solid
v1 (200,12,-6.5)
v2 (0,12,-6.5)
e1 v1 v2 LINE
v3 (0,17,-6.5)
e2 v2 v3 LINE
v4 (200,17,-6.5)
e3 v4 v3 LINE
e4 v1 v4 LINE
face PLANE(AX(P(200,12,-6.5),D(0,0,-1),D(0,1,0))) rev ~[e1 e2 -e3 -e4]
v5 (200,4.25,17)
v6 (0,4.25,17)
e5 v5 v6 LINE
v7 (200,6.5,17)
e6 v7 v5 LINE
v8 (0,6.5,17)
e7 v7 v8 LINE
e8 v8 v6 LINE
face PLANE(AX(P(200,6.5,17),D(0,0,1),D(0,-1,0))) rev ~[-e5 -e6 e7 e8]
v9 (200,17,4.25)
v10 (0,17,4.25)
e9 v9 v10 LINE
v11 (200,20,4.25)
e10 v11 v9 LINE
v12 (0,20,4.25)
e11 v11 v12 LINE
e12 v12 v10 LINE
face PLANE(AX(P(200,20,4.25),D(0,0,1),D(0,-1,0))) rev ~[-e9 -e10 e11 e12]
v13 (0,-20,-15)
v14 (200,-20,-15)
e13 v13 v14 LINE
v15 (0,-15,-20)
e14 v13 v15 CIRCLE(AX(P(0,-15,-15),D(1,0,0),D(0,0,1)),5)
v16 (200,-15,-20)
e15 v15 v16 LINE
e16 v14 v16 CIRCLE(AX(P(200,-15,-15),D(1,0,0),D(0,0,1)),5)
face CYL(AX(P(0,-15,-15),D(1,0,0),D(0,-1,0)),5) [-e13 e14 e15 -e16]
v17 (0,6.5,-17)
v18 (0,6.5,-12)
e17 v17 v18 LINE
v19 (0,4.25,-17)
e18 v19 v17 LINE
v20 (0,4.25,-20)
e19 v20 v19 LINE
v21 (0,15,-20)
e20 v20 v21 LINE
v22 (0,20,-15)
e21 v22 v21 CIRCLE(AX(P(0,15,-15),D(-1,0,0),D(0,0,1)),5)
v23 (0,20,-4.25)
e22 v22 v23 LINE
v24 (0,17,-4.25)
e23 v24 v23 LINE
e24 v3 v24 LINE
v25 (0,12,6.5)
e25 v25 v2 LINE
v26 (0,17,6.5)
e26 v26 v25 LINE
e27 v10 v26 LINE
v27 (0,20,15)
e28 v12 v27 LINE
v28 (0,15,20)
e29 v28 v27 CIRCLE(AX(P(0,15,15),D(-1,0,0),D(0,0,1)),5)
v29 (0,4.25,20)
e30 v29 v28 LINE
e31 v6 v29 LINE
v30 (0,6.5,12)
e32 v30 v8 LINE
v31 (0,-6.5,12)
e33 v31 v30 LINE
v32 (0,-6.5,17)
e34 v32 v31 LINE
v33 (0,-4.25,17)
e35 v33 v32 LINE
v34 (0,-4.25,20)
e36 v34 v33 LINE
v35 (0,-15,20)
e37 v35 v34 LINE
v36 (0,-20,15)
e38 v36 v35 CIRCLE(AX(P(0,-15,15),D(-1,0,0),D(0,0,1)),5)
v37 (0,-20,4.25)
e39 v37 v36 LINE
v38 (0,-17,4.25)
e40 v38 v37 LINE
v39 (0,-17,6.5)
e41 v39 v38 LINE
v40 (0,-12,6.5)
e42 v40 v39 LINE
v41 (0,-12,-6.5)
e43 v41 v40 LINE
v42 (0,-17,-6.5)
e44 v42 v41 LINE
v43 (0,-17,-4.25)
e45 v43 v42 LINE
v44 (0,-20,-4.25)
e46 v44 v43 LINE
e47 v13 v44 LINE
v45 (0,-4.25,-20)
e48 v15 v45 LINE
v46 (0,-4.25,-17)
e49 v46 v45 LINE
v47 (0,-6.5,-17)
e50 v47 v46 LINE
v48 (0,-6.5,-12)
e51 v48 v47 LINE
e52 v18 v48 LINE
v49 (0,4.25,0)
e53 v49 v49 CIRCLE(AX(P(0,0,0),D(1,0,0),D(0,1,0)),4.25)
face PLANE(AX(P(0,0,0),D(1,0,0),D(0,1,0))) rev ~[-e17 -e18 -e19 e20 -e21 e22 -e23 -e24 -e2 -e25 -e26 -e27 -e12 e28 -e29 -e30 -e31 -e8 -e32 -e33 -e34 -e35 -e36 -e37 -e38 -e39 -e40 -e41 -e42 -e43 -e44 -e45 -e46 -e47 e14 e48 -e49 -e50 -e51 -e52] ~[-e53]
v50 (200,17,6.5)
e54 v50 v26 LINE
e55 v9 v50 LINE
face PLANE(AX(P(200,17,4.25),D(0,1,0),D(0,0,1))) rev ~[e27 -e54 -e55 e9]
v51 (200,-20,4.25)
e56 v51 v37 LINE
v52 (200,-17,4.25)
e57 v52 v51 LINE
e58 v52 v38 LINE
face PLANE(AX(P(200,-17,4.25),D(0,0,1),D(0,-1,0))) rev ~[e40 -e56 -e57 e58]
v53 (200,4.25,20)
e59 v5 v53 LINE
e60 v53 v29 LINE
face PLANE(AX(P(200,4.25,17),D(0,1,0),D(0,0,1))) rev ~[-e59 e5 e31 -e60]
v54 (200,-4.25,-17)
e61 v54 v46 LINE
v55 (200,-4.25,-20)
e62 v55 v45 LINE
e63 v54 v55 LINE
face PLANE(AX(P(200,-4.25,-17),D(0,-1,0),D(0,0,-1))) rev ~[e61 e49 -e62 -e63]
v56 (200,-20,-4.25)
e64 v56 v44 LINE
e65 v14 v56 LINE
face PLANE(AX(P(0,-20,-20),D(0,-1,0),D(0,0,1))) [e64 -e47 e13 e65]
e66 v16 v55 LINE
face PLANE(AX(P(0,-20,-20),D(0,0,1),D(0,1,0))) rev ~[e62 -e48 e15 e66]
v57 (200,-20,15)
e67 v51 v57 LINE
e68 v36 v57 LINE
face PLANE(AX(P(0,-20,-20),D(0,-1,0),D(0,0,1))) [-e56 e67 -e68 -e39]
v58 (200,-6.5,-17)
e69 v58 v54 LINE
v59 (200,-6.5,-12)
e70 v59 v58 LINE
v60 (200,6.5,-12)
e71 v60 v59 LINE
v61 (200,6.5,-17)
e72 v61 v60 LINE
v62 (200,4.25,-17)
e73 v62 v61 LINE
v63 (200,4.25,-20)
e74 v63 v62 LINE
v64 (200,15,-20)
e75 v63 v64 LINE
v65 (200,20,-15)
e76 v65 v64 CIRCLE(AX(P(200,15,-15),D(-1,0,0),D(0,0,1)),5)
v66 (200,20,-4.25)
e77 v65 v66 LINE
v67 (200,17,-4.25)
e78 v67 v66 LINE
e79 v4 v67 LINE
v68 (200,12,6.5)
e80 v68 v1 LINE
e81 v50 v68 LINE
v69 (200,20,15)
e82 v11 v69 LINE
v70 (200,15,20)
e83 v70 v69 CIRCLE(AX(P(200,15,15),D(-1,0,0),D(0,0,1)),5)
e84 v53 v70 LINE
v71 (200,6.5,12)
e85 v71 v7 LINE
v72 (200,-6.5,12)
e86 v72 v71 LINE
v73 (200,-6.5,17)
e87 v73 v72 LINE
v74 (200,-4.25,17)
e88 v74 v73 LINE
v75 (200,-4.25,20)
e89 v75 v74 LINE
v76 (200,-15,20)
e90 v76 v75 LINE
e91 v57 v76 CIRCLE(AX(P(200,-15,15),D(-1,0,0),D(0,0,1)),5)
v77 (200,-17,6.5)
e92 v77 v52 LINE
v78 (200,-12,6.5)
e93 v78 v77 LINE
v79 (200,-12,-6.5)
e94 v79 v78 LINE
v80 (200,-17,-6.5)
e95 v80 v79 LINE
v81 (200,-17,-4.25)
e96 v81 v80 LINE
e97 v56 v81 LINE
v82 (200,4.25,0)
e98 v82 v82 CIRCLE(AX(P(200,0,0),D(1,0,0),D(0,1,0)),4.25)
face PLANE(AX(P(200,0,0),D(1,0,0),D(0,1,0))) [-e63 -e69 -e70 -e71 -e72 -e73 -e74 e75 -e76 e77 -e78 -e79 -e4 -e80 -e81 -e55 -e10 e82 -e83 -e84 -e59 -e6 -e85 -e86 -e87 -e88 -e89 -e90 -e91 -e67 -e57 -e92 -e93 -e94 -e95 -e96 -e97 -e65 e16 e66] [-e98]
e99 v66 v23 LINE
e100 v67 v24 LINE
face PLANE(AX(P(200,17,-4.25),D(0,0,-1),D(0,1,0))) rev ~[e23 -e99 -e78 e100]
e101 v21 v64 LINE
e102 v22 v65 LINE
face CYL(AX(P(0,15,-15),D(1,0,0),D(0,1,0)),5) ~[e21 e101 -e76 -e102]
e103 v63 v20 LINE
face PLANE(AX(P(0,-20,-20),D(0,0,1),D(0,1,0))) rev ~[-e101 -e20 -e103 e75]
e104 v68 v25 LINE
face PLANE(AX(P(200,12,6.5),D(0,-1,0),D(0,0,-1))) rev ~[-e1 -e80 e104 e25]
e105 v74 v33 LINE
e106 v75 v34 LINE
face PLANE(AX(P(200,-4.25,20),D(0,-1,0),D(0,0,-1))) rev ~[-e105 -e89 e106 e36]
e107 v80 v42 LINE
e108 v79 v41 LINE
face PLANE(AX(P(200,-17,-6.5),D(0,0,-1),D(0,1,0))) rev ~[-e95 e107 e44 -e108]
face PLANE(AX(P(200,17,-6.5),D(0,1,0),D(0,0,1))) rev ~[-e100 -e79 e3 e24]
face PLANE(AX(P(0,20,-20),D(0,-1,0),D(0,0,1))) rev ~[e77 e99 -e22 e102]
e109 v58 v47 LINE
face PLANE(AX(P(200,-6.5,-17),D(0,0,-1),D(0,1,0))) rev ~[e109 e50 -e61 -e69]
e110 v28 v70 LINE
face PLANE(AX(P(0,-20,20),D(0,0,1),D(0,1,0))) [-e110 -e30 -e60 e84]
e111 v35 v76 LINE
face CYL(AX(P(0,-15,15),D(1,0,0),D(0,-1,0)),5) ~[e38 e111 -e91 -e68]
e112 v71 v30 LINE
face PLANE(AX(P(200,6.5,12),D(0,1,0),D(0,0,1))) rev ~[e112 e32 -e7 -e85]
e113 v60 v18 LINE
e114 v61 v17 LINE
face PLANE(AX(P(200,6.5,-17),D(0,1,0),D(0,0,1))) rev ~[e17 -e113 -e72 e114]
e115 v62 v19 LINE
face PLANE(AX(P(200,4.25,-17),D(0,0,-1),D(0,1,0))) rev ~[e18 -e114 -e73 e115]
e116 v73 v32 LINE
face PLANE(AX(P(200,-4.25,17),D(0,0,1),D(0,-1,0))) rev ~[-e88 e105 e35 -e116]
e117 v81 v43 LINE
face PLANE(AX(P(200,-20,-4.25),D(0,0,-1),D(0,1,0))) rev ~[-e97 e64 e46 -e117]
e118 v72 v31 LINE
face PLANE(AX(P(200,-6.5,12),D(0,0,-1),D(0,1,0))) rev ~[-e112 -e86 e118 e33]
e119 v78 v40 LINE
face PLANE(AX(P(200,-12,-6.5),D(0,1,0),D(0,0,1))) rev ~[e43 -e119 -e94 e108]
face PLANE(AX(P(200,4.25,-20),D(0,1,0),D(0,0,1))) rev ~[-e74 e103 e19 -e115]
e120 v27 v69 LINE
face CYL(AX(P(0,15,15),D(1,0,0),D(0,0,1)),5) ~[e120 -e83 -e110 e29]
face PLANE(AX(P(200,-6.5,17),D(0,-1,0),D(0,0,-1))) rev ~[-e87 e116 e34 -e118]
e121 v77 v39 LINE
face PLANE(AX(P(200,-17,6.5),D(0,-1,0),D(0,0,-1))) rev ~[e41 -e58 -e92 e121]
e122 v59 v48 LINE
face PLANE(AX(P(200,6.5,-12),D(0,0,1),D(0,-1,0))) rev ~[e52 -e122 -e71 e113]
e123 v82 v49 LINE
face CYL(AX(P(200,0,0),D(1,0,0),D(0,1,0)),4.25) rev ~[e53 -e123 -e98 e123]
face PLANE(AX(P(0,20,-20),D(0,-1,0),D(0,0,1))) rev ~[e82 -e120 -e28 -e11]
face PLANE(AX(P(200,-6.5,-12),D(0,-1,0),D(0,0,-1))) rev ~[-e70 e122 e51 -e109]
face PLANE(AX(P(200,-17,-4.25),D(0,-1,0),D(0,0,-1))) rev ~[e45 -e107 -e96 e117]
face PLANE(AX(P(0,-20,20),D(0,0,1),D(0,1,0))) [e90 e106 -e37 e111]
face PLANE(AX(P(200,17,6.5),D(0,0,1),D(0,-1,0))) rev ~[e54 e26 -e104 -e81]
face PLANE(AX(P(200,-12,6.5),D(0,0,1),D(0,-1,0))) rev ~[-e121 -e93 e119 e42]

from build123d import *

# Parameters (mm, degrees)
F0_W            = 40
F0_H            = 40
F1_DEPTH        = 200
F3_DEPTH        = 200
F3_COPIES_COUNT = 4
F4_R            = 5
F5_R            = 4.25
F6_DEPTH        = 200


# Not quite as in the source:
# - a pattern or mirror of a feature is missing from the dataset's text; its kind, count and spacing are read off the source's solid


with BuildPart() as f1:
    # F0 (on Right) → F1 (new body)
    with BuildSketch(Plane.YZ):
        Rectangle(F0_W, F0_H)
    extrude(amount=F1_DEPTH)

    # F2 (on face) → F3 (cut, through all)
    with BuildSketch(Plane.YZ.offset(200)):
        Polygon((4.25, 20), (-4.25, 20), (-4.25, 17), (-6.5, 17), (-6.5, 12), (6.5, 12), (6.5, 17), (4.25, 17), align=None)
    f3 = extrude(amount=-F3_DEPTH, mode=Mode.SUBTRACT)

    # F3_copies: F3 ×4 about axis
    f3_copies_axis = Axis((0, 0, 0), (1, 0, 0))
    for i in range(1, F3_COPIES_COUNT):
        add(f3.rotate(f3_copies_axis, i * 360 / F3_COPIES_COUNT), mode=Mode.SUBTRACT)

    # F4
    f4_edges = [f1.edges().sort_by_distance(p)[0] for p in [
        (100, 20, 20),
        (100, -20, 20),
        (100, 20, -20),
        (100, -20, -20),
    ]]
    fillet(f4_edges, radius=F4_R)

    # F5 (on face) → F6 (cut, through all)
    with BuildSketch(Plane.YZ.offset(200)):
        Circle(F5_R)
    extrude(amount=-F6_DEPTH, mode=Mode.SUBTRACT)


solid = f1.part
